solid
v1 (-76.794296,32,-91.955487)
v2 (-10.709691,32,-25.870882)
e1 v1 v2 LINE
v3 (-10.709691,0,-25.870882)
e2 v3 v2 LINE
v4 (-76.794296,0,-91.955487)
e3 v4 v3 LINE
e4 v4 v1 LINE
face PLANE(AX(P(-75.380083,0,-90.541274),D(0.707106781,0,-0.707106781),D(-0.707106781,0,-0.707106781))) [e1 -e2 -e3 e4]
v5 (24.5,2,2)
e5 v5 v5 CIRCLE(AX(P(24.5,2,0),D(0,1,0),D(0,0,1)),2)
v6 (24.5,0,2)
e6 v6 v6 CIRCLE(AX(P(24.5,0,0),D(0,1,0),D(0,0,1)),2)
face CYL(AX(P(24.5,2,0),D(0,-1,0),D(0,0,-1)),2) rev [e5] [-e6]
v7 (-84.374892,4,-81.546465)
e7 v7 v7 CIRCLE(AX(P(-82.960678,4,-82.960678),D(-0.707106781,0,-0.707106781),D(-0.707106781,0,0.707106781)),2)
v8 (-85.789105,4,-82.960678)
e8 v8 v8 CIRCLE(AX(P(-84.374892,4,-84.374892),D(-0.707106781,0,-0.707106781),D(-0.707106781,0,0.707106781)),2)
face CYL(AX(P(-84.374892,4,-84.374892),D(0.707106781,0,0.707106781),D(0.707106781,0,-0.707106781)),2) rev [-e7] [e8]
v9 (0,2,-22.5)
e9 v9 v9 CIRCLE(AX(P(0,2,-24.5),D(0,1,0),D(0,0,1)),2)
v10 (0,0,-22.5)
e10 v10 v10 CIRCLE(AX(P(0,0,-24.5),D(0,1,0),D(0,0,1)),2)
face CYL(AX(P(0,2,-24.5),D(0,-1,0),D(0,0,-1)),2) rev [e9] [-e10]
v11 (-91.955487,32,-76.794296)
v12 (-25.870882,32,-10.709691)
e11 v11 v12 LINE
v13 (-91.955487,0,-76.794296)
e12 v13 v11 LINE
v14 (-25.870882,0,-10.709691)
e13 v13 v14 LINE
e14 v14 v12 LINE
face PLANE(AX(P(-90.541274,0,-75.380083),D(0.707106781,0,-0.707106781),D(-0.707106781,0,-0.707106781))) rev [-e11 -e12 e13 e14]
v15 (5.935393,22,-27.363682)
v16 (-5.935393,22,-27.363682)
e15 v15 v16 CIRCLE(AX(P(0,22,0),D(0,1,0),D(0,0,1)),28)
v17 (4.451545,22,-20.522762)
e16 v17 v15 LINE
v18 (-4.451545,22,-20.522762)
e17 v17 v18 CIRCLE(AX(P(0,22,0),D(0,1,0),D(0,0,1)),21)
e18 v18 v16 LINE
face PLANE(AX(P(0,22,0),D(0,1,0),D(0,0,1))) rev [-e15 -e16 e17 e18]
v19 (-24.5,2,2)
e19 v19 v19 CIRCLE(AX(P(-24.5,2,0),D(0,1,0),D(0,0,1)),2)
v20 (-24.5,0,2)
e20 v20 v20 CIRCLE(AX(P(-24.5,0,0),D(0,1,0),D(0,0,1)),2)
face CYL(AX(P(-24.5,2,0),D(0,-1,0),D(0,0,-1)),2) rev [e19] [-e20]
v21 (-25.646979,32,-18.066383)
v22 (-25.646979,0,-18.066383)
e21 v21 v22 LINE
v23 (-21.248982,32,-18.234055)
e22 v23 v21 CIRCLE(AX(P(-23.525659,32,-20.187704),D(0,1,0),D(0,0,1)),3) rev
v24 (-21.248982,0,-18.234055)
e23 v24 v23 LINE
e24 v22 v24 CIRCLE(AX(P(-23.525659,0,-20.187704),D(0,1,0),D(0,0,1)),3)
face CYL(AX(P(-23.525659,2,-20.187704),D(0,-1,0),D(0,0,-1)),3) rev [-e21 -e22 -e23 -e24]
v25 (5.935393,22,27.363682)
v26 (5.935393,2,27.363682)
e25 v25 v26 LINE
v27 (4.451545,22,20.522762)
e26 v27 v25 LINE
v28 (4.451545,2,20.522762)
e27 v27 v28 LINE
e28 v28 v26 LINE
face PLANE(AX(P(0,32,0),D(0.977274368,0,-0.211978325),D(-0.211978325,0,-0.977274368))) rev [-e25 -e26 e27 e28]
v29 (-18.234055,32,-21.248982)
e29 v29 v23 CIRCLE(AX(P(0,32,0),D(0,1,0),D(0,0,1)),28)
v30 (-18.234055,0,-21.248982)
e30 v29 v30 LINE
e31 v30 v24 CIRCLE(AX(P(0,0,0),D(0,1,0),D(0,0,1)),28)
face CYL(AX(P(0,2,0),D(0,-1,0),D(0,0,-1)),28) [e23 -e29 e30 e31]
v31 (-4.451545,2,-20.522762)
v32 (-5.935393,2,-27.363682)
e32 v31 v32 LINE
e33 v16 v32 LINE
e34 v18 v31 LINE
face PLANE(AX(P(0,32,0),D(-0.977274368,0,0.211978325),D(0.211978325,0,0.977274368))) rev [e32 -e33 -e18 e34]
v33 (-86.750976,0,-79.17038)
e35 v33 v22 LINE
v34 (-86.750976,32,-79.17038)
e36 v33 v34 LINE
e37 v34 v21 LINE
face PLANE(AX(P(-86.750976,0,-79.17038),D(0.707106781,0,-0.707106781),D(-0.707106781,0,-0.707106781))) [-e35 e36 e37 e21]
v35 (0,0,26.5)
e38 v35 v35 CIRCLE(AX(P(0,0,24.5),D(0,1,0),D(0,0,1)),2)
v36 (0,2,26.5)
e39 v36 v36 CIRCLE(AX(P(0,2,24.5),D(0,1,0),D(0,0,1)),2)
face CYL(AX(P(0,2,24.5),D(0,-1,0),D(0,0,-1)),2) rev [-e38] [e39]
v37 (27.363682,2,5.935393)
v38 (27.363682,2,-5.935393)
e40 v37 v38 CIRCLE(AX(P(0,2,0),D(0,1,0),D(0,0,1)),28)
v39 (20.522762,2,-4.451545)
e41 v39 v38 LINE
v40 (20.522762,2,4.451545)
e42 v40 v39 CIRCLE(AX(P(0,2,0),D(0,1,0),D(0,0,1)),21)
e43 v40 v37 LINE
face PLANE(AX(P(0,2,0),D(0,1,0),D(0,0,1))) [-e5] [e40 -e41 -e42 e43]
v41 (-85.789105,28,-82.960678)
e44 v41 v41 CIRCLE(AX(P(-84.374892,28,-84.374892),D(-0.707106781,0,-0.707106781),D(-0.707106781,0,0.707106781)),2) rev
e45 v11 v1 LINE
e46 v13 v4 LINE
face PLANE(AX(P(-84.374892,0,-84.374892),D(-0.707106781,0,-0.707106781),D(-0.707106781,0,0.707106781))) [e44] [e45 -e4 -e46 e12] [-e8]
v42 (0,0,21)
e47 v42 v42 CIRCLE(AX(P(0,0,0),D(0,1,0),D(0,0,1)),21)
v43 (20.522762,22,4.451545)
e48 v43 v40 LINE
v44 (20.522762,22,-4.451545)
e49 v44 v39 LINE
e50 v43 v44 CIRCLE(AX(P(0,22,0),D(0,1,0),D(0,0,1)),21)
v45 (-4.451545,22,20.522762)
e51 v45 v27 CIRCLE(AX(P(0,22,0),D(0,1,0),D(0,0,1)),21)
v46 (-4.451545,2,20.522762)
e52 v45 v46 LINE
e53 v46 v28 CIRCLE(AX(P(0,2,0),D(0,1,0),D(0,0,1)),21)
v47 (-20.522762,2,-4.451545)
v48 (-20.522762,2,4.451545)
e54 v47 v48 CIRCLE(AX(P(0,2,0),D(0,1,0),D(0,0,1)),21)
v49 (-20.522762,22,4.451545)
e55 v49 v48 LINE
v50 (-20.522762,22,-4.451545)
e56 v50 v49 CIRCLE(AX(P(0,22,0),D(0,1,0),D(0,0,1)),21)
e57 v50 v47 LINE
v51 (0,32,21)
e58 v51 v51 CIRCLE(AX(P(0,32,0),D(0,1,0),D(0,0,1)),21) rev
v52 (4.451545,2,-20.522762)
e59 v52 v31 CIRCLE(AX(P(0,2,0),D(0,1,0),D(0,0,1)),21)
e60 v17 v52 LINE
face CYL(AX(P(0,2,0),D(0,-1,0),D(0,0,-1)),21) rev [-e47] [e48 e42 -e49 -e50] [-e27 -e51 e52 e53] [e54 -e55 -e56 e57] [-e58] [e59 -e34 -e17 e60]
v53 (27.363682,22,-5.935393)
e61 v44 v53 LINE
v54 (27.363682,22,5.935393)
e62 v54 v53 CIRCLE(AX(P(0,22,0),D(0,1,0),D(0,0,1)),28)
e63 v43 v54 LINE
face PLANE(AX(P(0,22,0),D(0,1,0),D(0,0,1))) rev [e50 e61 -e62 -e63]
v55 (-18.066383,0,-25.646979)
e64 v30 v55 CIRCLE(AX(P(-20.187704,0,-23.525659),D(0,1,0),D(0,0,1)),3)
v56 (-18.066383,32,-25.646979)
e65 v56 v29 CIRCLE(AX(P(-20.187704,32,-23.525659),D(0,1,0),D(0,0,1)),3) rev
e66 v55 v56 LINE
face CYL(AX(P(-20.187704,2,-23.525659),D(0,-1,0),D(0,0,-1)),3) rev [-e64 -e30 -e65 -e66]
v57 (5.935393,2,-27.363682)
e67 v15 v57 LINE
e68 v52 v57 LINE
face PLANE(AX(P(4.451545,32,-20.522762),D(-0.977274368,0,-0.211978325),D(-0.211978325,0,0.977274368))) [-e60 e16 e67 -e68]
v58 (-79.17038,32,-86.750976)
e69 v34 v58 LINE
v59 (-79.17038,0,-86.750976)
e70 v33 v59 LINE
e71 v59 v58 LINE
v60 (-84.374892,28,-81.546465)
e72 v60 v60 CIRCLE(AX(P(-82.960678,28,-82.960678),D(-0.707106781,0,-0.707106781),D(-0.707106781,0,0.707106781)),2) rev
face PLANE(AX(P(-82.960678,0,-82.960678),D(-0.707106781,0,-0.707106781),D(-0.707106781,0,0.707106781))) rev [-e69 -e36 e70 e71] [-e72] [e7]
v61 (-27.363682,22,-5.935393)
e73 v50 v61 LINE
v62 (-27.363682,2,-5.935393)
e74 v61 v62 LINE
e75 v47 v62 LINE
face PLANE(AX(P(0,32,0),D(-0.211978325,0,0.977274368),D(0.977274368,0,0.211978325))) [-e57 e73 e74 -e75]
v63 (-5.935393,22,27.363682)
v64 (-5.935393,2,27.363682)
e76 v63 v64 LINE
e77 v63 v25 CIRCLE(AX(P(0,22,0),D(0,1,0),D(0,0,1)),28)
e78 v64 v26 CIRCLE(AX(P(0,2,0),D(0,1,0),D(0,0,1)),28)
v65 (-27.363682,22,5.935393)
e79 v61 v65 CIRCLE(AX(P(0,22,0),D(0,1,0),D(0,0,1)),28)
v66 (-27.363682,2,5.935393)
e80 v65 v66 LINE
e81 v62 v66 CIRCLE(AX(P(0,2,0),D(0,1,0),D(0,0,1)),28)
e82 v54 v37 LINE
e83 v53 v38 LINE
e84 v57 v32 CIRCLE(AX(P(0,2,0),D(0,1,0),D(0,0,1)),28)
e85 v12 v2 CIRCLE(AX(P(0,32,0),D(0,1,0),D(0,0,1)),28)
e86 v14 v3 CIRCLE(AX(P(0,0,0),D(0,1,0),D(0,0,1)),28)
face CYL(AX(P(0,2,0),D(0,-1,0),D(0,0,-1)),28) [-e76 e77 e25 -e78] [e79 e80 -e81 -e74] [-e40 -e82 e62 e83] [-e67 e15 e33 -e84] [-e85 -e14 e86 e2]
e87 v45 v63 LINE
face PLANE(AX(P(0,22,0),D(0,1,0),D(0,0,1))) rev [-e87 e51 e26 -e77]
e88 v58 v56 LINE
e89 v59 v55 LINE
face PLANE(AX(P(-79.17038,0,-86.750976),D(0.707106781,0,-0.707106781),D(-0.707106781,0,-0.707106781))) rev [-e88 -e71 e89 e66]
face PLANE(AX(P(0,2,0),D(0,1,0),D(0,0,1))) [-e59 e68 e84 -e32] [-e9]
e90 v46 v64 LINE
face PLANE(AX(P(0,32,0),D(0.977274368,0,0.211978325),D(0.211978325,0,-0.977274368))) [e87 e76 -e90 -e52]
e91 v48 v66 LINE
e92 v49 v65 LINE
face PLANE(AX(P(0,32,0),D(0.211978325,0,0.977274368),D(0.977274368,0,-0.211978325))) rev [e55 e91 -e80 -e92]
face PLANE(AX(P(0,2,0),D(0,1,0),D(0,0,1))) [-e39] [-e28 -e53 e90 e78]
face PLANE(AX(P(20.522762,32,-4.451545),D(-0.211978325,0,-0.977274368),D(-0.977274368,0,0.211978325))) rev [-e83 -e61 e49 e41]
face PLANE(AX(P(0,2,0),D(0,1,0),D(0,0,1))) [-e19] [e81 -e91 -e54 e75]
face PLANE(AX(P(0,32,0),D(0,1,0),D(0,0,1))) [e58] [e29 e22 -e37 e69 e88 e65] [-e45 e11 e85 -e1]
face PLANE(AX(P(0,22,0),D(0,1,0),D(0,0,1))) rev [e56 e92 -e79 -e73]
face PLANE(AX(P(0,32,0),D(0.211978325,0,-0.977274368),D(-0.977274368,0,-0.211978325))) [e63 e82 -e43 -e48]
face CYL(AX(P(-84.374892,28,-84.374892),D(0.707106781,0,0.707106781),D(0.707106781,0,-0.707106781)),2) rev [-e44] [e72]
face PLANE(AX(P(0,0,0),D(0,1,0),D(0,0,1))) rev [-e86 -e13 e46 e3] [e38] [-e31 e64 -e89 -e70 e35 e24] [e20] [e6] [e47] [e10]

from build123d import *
from build123d.topology import SkipClean

# Parameters (mm, degrees)
SKETCH_1_R          = 28
SKETCH_1_R_2        = 2
SKETCH_1_R_3        = 21
EXTRUDE_1_DEPTH     = 2
EXTRUDE_3_DEPTH     = 30
EXTRUDE_START       = -10
SKETCH_5_R          = 28
SKETCH_5_R_2        = 21
EXTRUDE_4_DEPTH     = 10
SKETCH_6_W          = 5.360290559
SKETCH_6_H          = 32
EXTRUDE_6_DEPTH     = 100
SKETCH_9_R          = 21
CUT_EXTRUDE_1_DEPTH = 32
SKETCH_11_W         = 21.441162236
SKETCH_11_H         = 32
SKETCH_11_R         = 2
EXTRUDE_7_DEPTH     = 2
FILLET_1_R          = 3


with BuildPart() as part:
    # 草图1 → 凸台-拉伸1 (new body)
    with BuildSketch(Plane(origin=(0, 0, 0), x_dir=(1, 0, 0), z_dir=(0, 1, 0))):
        with Locations(Location((0, 0, 0), (0, 0, 270))):
            Circle(SKETCH_1_R)
        with Locations(Location((-24.5, 0, 0), (0, 0, 270))):
            Circle(SKETCH_1_R_2, mode=Mode.SUBTRACT)
        with Locations(Location((0, 24.5, 0), (0, 0, 270))):
            Circle(SKETCH_1_R_2, mode=Mode.SUBTRACT)
        with Locations(Location((24.5, 0, 0), (0, 0, 270))):
            Circle(SKETCH_1_R_2, mode=Mode.SUBTRACT)
        with Locations(Location((0, -24.5, 0), (0, 0, 270))):
            Circle(SKETCH_1_R_2, mode=Mode.SUBTRACT)
        with Locations(Location((0, 0, 0), (0, 0, 270))):
            Circle(SKETCH_1_R_3, mode=Mode.SUBTRACT)
    extrude(amount=EXTRUDE_1_DEPTH)

    # 草图2 → 凸台-拉伸3 (add)
    with SkipClean():  # the faces are left unmerged after this step: merging them gives an invalid solid
        with BuildSketch(Plane(origin=(0, 2, 0), x_dir=(1, 0, 0), z_dir=(0, 1, 0))):
            with BuildLine():
                ThreePointArc((-20.522761723, 4.451544819), (-14.849242405, 14.849242405), (-4.451544819, 20.522761723))
                Line((-4.451544819, 20.522761723), (-5.935393092, 27.363682297))
                ThreePointArc((-5.935393092, 27.363682297), (-19.798989873, 19.798989873), (-27.363682297, 5.935393092))
                Line((-27.363682297, 5.935393092), (-20.522761723, 4.451544819))
            make_face()
            with BuildLine():
                ThreePointArc((5.935393092, -27.363682297), (19.798989873, -19.798989873), (27.363682297, -5.935393092))
                Line((27.363682297, -5.935393092), (20.522761723, -4.451544819))
                ThreePointArc((20.522761723, -4.451544819), (14.849242405, -14.849242405), (4.451544819, -20.522761723))
                Line((4.451544819, -20.522761723), (5.935393092, -27.363682297))
            make_face()
            with BuildLine():
                ThreePointArc((-4.451544819, -20.522761723), (-14.849242405, -14.849242405), (-20.522761723, -4.451544819))
                Line((-20.522761723, -4.451544819), (-27.363682297, -5.935393092))
                ThreePointArc((-27.363682297, -5.935393092), (-19.798989873, -19.798989873), (-5.935393092, -27.363682297))
                Line((-5.935393092, -27.363682297), (-4.451544819, -20.522761723))
            make_face()
            with BuildLine():
                Line((4.451544819, 20.522761723), (5.935393092, 27.363682297))
                ThreePointArc((5.935393092, 27.363682297), (19.798989873, 19.798989873), (27.363682297, 5.935393092))
                Line((27.363682297, 5.935393092), (20.522761723, 4.451544819))
                ThreePointArc((20.522761723, 4.451544819), (14.849242405, 14.849242405), (4.451544819, 20.522761723))
            make_face()
        extrude(amount=EXTRUDE_3_DEPTH)

    # 草图5 → 凸台-拉伸4 (add)
    with SkipClean():  # the faces are left unmerged after this step: merging them gives an invalid solid
        with BuildSketch(Plane(origin=(0, 32, 0), x_dir=(1, 0, 0), z_dir=(0, 1, 0)).offset(EXTRUDE_START)):
            with Locations(Location((0, 0, 0), (0, 0, 270))):
                Circle(SKETCH_5_R)
            with Locations(Location((0, 0, 0), (0, 0, 270))):
                Circle(SKETCH_5_R_2, mode=Mode.SUBTRACT)
        extrude(amount=EXTRUDE_4_DEPTH)

    # 草图6 → 凸台-拉伸6 (add)
    with SkipClean():  # the faces are left unmerged after this step: merging them gives an invalid solid
        with BuildSketch(Plane(origin=(-12.25, 0, -12.25), x_dir=(-0.7071067811865488, 0, 0.7071067811865462), z_dir=(-0.7071067811865462, 0, -0.7071067811865488))):
            with Locations((-8.040435839, 16)):
                Rectangle(SKETCH_6_W, SKETCH_6_H)
            with Locations((8.040435839, 16)):
                Rectangle(SKETCH_6_W, SKETCH_6_H)
        extrude(amount=EXTRUDE_6_DEPTH)

    # 草图9 → 切除-拉伸1 (cut)
    with SkipClean():  # the faces are left unmerged after this step: merging them gives an invalid solid
        with BuildSketch(Plane.XZ):
            with Locations(Location((0, 0, 0), (0, 0, 90))):
                Circle(SKETCH_9_R)
        extrude(amount=-CUT_EXTRUDE_1_DEPTH, mode=Mode.SUBTRACT)
    add(part.part.scale(1), mode=Mode.REPLACE)  # the faces are merged on a copy

    # 草图11 → 凸台-拉伸7 (add)
    with SkipClean():  # the faces are left unmerged after this step: merging them gives an invalid solid
        with BuildSketch(Plane(origin=(-82.960678119, 0, -82.960678119), x_dir=(-0.7071067811865488, 0, 0.7071067811865462), z_dir=(-0.7071067811865462, 0, -0.7071067811865488))):
            with Locations((0, 16)):
                Rectangle(SKETCH_11_W, SKETCH_11_H)
            with Locations((0, 4)):
                Circle(SKETCH_11_R, mode=Mode.SUBTRACT)
            with Locations((0, 28)):
                Circle(SKETCH_11_R, mode=Mode.SUBTRACT)
        extrude(amount=EXTRUDE_7_DEPTH)

    # 圆角1
    fillet_1_edges = [part.edges().sort_by_distance(p)[0] for p in [
        (-15.642500311, 12, -23.223095918),
        (-23.223095918, 12, -15.642500311),
    ]]
    fillet(fillet_1_edges, radius=FILLET_1_R)


solid = part.part
